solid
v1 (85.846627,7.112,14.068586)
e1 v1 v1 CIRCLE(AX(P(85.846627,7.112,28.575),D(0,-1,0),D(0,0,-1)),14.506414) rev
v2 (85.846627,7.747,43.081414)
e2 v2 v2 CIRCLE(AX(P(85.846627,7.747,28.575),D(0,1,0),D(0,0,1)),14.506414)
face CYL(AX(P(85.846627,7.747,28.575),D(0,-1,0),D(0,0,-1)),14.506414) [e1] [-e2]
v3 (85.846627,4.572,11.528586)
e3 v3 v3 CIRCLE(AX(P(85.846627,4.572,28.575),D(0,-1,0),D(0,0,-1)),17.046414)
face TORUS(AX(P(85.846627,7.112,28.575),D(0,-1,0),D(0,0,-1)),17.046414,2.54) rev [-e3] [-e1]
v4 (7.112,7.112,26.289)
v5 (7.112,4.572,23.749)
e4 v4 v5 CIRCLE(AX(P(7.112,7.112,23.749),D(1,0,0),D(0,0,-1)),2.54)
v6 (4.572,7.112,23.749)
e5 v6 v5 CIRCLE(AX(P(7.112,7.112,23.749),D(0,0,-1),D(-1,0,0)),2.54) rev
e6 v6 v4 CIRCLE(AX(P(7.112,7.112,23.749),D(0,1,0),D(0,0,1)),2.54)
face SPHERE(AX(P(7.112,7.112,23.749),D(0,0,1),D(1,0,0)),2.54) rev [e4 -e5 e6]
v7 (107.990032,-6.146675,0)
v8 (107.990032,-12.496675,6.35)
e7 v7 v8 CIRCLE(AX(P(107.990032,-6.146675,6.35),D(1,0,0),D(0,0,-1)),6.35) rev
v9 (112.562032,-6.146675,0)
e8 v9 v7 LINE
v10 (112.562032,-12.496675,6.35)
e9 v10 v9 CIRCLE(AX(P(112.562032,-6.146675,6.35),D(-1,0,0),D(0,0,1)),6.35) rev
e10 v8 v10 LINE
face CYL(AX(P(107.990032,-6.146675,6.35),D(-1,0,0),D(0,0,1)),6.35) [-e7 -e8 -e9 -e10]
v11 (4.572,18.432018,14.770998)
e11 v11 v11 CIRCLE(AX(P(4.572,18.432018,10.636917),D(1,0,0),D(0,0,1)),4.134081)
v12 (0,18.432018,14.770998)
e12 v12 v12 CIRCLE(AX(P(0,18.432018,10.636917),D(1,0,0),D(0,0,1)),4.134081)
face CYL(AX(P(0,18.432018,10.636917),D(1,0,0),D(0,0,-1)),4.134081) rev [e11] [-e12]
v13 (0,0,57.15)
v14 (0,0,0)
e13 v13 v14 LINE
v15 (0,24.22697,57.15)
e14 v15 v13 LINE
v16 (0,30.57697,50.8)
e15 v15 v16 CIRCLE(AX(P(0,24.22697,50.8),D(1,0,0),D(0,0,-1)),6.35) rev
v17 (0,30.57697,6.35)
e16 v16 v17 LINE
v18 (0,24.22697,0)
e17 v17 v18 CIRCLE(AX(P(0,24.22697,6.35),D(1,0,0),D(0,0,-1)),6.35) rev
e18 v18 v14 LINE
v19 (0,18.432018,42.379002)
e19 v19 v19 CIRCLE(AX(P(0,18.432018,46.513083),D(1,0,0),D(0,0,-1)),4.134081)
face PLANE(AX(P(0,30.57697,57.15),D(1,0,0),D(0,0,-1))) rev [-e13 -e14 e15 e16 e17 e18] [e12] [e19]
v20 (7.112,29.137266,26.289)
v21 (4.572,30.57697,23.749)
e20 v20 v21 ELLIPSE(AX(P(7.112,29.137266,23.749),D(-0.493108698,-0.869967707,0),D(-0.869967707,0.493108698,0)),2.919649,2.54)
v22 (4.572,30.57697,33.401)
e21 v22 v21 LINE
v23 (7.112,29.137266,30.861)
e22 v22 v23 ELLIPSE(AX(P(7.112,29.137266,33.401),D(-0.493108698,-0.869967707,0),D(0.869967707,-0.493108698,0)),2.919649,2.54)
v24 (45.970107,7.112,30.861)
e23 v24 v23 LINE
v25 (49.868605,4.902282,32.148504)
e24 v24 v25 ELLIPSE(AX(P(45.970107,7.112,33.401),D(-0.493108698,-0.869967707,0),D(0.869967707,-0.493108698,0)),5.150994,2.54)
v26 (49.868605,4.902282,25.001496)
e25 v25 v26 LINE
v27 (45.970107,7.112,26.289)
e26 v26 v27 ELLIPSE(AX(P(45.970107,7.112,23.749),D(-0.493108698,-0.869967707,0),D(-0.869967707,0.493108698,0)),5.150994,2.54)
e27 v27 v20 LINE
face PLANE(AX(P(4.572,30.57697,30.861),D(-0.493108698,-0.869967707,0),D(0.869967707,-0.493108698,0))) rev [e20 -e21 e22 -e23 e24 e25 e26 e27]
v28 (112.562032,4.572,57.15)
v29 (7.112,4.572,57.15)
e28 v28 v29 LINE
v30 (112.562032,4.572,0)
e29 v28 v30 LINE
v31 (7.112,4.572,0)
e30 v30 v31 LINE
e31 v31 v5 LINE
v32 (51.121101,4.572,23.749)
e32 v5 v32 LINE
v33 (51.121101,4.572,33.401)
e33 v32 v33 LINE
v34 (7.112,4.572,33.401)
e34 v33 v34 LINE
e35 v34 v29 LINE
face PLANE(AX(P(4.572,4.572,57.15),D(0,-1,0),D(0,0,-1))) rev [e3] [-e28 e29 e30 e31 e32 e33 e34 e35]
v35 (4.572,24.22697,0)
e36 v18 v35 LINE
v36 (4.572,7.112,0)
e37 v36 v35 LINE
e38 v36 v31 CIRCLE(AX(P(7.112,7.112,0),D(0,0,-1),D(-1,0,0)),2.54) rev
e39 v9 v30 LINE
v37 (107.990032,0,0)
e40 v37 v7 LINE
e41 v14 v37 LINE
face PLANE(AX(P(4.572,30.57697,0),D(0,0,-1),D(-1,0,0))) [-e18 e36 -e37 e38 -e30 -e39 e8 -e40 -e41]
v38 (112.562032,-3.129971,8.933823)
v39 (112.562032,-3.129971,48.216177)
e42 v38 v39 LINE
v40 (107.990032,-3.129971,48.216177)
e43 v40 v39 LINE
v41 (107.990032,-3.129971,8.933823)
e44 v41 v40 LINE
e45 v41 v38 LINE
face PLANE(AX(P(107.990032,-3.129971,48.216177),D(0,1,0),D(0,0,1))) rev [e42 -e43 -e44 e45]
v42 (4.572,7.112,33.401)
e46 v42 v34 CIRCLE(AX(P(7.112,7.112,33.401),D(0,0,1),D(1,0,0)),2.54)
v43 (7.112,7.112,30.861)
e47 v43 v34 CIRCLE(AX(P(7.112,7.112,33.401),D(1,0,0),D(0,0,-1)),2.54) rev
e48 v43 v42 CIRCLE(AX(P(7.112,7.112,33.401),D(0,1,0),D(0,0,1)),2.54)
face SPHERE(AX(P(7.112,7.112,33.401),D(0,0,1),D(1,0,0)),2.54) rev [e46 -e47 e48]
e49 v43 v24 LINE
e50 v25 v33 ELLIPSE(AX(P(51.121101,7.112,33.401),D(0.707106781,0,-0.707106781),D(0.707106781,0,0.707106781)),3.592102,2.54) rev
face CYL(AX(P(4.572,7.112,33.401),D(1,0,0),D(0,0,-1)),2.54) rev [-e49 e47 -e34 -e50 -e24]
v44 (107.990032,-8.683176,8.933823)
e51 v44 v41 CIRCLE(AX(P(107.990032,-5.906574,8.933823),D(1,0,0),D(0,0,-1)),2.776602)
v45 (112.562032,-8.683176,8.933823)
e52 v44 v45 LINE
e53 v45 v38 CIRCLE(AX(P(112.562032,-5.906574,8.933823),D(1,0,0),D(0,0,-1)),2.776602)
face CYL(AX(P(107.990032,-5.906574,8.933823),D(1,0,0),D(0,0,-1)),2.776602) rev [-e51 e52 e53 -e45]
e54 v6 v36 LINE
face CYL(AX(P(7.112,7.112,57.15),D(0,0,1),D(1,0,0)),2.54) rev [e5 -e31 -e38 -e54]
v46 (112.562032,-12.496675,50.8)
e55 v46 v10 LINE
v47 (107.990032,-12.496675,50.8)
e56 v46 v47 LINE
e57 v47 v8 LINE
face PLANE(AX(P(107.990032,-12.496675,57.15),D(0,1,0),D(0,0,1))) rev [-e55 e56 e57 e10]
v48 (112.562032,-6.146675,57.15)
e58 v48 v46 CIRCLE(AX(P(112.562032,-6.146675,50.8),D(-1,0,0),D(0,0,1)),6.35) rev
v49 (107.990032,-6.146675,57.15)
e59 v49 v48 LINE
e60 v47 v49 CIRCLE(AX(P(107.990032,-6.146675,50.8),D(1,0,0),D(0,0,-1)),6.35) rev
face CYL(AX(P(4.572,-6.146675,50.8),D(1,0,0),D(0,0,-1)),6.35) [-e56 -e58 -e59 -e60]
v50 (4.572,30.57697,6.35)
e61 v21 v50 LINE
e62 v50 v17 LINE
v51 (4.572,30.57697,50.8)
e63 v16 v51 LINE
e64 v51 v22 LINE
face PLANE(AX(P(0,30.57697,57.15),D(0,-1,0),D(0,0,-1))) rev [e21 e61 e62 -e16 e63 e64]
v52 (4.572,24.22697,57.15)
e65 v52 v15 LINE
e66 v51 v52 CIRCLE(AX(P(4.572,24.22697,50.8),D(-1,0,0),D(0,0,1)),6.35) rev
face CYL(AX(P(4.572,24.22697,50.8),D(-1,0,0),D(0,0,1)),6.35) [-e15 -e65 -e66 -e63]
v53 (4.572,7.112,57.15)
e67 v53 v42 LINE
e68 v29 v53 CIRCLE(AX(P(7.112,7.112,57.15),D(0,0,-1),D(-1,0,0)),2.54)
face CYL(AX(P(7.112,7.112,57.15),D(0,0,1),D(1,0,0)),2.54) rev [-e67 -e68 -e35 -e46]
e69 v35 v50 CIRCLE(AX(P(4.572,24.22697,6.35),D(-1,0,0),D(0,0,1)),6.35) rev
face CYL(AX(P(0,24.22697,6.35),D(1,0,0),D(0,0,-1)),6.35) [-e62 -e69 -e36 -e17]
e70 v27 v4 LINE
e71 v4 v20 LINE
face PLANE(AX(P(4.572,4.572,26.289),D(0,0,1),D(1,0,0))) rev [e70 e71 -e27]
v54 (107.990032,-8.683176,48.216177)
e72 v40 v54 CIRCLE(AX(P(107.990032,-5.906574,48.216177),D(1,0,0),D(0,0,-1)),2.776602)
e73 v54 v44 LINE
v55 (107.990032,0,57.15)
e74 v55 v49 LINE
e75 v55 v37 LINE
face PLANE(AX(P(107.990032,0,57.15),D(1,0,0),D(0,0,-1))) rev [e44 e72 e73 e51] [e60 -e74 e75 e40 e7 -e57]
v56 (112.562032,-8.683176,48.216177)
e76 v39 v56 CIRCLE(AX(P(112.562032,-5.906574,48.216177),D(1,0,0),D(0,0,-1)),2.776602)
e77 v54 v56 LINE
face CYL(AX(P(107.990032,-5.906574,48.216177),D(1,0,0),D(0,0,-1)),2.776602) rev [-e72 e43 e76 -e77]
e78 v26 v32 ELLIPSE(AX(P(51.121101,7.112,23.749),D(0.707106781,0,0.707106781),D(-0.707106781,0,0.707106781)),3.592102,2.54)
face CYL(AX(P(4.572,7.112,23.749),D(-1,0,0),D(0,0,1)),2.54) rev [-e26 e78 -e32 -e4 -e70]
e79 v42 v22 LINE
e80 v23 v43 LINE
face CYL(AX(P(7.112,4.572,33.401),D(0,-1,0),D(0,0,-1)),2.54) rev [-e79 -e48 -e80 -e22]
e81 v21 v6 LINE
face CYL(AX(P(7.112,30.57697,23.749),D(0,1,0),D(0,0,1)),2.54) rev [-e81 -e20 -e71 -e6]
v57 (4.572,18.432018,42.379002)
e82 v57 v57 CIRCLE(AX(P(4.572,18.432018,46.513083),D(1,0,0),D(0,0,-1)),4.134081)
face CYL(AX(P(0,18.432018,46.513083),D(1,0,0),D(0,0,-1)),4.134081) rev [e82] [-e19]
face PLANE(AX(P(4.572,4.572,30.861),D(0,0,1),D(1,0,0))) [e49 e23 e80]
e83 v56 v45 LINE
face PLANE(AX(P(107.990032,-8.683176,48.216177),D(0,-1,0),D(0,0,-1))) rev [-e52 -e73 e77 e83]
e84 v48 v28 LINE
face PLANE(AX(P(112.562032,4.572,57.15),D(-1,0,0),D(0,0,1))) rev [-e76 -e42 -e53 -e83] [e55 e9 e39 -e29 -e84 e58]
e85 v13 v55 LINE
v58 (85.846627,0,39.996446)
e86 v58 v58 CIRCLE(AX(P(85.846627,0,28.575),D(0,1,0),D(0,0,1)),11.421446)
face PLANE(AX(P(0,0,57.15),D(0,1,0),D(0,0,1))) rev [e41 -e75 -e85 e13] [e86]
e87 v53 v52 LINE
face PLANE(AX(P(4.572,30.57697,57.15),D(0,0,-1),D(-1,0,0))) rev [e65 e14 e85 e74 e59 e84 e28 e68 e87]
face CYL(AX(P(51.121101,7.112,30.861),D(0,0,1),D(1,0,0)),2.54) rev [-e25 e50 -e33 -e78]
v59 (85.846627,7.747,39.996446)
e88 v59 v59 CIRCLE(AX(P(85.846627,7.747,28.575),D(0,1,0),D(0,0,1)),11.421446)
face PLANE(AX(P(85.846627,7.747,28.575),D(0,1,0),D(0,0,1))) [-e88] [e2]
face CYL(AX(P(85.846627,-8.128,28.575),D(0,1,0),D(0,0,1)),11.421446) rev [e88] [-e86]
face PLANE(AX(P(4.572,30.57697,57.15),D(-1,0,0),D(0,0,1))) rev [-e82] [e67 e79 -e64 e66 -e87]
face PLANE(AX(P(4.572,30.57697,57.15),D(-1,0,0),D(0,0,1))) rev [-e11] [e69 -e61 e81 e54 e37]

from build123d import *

# Parameters (mm, degrees)
EXTRUDE1_DEPTH = 57.15
SKETCH2_R      = 14.506414019
EXTRUDE2_DEPTH = 3.175
FILLET1_R      = 2.54
SKETCH3_R      = 11.421445599
EXTRUDE3_DEPTH = 15.875
EXTRUDE4_DEPTH = 2.286
FILLET4_R      = 2.54
FILLET5_R      = 6.35
EXTRUDE5_DEPTH = 4.572
SKETCH6_R      = 4.134080516
EXTRUDE6_DEPTH = 4.572


with BuildPart() as part:
    # Sketch1 → Extrude1 (new body)
    with BuildSketch(Plane.XY):
        Polygon((0, 30.576970443), (0, 0), (107.990032379, 0), (107.990032379, -12.496674877), (112.562032379, -12.496674877), (112.562032379, 4.572), (4.572, 4.572), (4.572, 30.576970443), align=None)
    extrude(amount=EXTRUDE1_DEPTH)

    # Sketch2 → Extrude2 (add)
    with BuildSketch(Plane(origin=(0, 4.572, 0), x_dir=(-1, 0, 0), z_dir=(0, 1, 0))):
        with Locations(Location((-85.846627335, 28.575, 0), (0, 0, 270))):
            Circle(SKETCH2_R)
    extrude(amount=EXTRUDE2_DEPTH)

    # Fillet1
    fillet1_edges = [part.edges().sort_by_distance(p)[0] for p in [
        (85.846627335, 4.572, 43.081414019),
    ]]
    fillet(fillet1_edges, radius=FILLET1_R)

    # Sketch3 → Extrude3 (cut)
    with BuildSketch(Plane(origin=(0, 7.747, 0), x_dir=(-1, 0, 0), z_dir=(0, 1, 0))):
        with Locations(Location((-85.846627335, 28.575, 0), (0, 0, 90))):
            Circle(SKETCH3_R)
    extrude(amount=-EXTRUDE3_DEPTH, mode=Mode.SUBTRACT)

    # Sketch4 → Extrude4 (add, symmetric)
    with BuildSketch(Plane.XY.offset(28.575)):
        Polygon((4.572, 30.576970443), (50.451305306, 4.572), (4.572, 4.572), align=None)
    extrude(amount=EXTRUDE4_DEPTH, both=True)

    # Fillet4
    fillet4_edges = [part.edges().sort_by_distance(p)[0] for p in [
        (27.511652653, 4.572, 26.289),
    ]]
    fillet(fillet4_edges, radius=FILLET4_R)
    fillet4_2_edges = [part.edges().sort_by_distance(p)[0] for p in [
        (27.511652653, 4.572, 30.861),
    ]]
    fillet(fillet4_2_edges, radius=FILLET4_R)
    fillet4_3_edges = [part.edges().sort_by_distance(p)[0] for p in [
        (50.451305306, 4.572, 28.575),
    ]]
    fillet(fillet4_3_edges, radius=FILLET4_R)
    # the kernel refuses this fillet: 2.54 mm, written as the material it adds along each edge
    with BuildSketch(Plane(origin=(4.572, 4.572, 0), x_dir=(1, 0, 0), z_dir=(0, 0, 1))) as fillet4_4_piece_1:
        with BuildLine():
            CenterArc((FILLET4_R, FILLET4_R), FILLET4_R, 180, 90)
            Line((0, FILLET4_R), (-FILLET4_R * 0.02, FILLET4_R))
            Line((-FILLET4_R * 0.02, FILLET4_R), (-FILLET4_R * 0.02, -FILLET4_R * 0.02))
            Line((-FILLET4_R * 0.02, -FILLET4_R * 0.02), (FILLET4_R, -FILLET4_R * 0.02))
            Line((FILLET4_R, -FILLET4_R * 0.02), (FILLET4_R, 0))
        make_face()
    extrude(amount=23.749)
    with BuildSketch(Plane(origin=(4.572, 7.112, 23.749), x_dir=(0, -1, 0), z_dir=(0, 0, -1))) as fillet4_4_piece_2:
        with BuildLine():
            CenterArc((2.54 - FILLET4_R, -FILLET4_R), FILLET4_R, 0, 90)
            Line((2.54 - FILLET4_R, 0), (2.54 - FILLET4_R, FILLET4_R * 0.02))
            Line((2.54 - FILLET4_R, FILLET4_R * 0.02), (2.54, FILLET4_R * 0.02))
            Line((2.54, FILLET4_R * 0.02), (2.54 + FILLET4_R * 0.02, 0))
            Line((2.54 + FILLET4_R * 0.02, 0), (2.54 + FILLET4_R * 0.02, -FILLET4_R))
            Line((2.54 + FILLET4_R * 0.02, -FILLET4_R), (2.54, -FILLET4_R))
        make_face()
    revolve(axis=Axis((4.572, 7.112, 23.749), (-1, 0, 0)), revolution_arc=90)
    with BuildSketch(Plane(origin=(4.572, 7.112, 26.289), x_dir=(0, 0, -1), z_dir=(0, 1, 0))) as fillet4_4_piece_3_section:
        with BuildLine():
            CenterArc((FILLET4_R, -FILLET4_R), FILLET4_R, 90, 90)
            Line((0, -FILLET4_R), (-FILLET4_R * 0.02, -FILLET4_R))
            Line((-FILLET4_R * 0.02, -FILLET4_R), (-FILLET4_R * 0.02, FILLET4_R * 0.02))
            Line((-FILLET4_R * 0.02, FILLET4_R * 0.02), (FILLET4_R, FILLET4_R * 0.02))
            Line((FILLET4_R, FILLET4_R * 0.02), (FILLET4_R, 0))
        make_face()
    fillet4_4_piece_3 = extrude(amount=23.464970443, mode=Mode.PRIVATE)
    fillet4_4_piece_3 = split(fillet4_4_piece_3, bisect_by=Plane(origin=(10.10405857, 27.441329687, 25.709650316), z_dir=(-0.49310869822243814, -0.8699677072957206, 0)), keep=Keep.TOP, mode=Mode.PRIVATE)
    add(fillet4_4_piece_3)
    # the kernel refuses this fillet: 2.54 mm, written as the material it adds along each edge
    with BuildSketch(Plane(origin=(4.572, 4.572, 33.401), x_dir=(1, 0, 0), z_dir=(0, 0, 1))) as fillet4_5_piece_1:
        with BuildLine():
            CenterArc((FILLET4_R, FILLET4_R), FILLET4_R, 180, 90)
            Line((0, FILLET4_R), (-FILLET4_R * 0.02, FILLET4_R))
            Line((-FILLET4_R * 0.02, FILLET4_R), (-FILLET4_R * 0.02, -FILLET4_R * 0.02))
            Line((-FILLET4_R * 0.02, -FILLET4_R * 0.02), (FILLET4_R, -FILLET4_R * 0.02))
            Line((FILLET4_R, -FILLET4_R * 0.02), (FILLET4_R, 0))
        make_face()
    extrude(amount=23.749)
    with BuildSketch(Plane(origin=(4.572, 7.112, 33.401), x_dir=(0, -1, 0), z_dir=(0, 0, 1))) as fillet4_5_piece_2:
        with BuildLine():
            CenterArc((2.54 - FILLET4_R, FILLET4_R), FILLET4_R, 270, 90)
            Line((2.54 - FILLET4_R, 0), (2.54 - FILLET4_R, -FILLET4_R * 0.02))
            Line((2.54 - FILLET4_R, -FILLET4_R * 0.02), (2.54, -FILLET4_R * 0.02))
            Line((2.54, -FILLET4_R * 0.02), (2.54 + FILLET4_R * 0.02, 0))
            Line((2.54 + FILLET4_R * 0.02, 0), (2.54 + FILLET4_R * 0.02, FILLET4_R))
            Line((2.54 + FILLET4_R * 0.02, FILLET4_R), (2.54, FILLET4_R))
        make_face()
    revolve(axis=Axis((4.572, 7.112, 33.401), (1, 0, 0)), revolution_arc=90)
    with BuildSketch(Plane(origin=(4.572, 7.112, 30.861), x_dir=(1, 0, 0), z_dir=(0, 1, 0))) as fillet4_5_piece_3_section:
        with BuildLine():
            CenterArc((FILLET4_R, -FILLET4_R), FILLET4_R, 90, 90)
            Line((0, -FILLET4_R), (-FILLET4_R * 0.02, -FILLET4_R))
            Line((-FILLET4_R * 0.02, -FILLET4_R), (-FILLET4_R * 0.02, FILLET4_R * 0.02))
            Line((-FILLET4_R * 0.02, FILLET4_R * 0.02), (FILLET4_R, FILLET4_R * 0.02))
            Line((FILLET4_R, FILLET4_R * 0.02), (FILLET4_R, 0))
        make_face()
    fillet4_5_piece_3 = extrude(amount=23.464970443, mode=Mode.PRIVATE)
    fillet4_5_piece_3 = split(fillet4_5_piece_3, bisect_by=Plane(origin=(10.10405857, 27.441329687, 31.440349684), z_dir=(-0.49310869822243814, -0.8699677072957206, 0)), keep=Keep.TOP, mode=Mode.PRIVATE)
    add(fillet4_5_piece_3)

    # Fillet5
    fillet5_edges = [part.edges().sort_by_distance(p)[0] for p in [
        (2.286, 30.576970443, 0),
        (110.276032379, -12.496674877, 57.15),
        (2.286, 30.576970443, 57.15),
        (110.276032379, -12.496674877, 0),
    ]]
    fillet(fillet5_edges, radius=FILLET5_R)

    # Sketch5 → Extrude5 (cut)
    with BuildSketch(Plane(origin=(112.562032379, 0, 0), x_dir=(0, 0, -1), z_dir=(1, 0, 0))):
        with BuildLine():
            Line((-48.21617711, -3.129971145), (-8.93382289, -3.129971145))
            ThreePointArc((-8.93382289, -3.129971145), (-6.157220398, -5.906573636), (-8.93382289, -8.683176127))
            Line((-8.93382289, -8.683176127), (-48.21617711, -8.683176127))
            ThreePointArc((-48.21617711, -8.683176127), (-50.992779602, -5.906573636), (-48.21617711, -3.129971145))
        make_face()
    extrude(amount=-EXTRUDE5_DEPTH, mode=Mode.SUBTRACT)

    # Sketch6 → Extrude6 (cut)
    with BuildSketch(Plane(origin=(4.572, 0, 0), x_dir=(0, 0, -1), z_dir=(1, 0, 0))):
        with Locations((-46.51308259, 18.4320182)):
            Circle(SKETCH6_R)
        with Locations(Location((-10.63691741, 18.4320182, 0), (0, 0, 180))):
            Circle(SKETCH6_R)
    extrude(amount=-EXTRUDE6_DEPTH, mode=Mode.SUBTRACT)


solid = part.part
